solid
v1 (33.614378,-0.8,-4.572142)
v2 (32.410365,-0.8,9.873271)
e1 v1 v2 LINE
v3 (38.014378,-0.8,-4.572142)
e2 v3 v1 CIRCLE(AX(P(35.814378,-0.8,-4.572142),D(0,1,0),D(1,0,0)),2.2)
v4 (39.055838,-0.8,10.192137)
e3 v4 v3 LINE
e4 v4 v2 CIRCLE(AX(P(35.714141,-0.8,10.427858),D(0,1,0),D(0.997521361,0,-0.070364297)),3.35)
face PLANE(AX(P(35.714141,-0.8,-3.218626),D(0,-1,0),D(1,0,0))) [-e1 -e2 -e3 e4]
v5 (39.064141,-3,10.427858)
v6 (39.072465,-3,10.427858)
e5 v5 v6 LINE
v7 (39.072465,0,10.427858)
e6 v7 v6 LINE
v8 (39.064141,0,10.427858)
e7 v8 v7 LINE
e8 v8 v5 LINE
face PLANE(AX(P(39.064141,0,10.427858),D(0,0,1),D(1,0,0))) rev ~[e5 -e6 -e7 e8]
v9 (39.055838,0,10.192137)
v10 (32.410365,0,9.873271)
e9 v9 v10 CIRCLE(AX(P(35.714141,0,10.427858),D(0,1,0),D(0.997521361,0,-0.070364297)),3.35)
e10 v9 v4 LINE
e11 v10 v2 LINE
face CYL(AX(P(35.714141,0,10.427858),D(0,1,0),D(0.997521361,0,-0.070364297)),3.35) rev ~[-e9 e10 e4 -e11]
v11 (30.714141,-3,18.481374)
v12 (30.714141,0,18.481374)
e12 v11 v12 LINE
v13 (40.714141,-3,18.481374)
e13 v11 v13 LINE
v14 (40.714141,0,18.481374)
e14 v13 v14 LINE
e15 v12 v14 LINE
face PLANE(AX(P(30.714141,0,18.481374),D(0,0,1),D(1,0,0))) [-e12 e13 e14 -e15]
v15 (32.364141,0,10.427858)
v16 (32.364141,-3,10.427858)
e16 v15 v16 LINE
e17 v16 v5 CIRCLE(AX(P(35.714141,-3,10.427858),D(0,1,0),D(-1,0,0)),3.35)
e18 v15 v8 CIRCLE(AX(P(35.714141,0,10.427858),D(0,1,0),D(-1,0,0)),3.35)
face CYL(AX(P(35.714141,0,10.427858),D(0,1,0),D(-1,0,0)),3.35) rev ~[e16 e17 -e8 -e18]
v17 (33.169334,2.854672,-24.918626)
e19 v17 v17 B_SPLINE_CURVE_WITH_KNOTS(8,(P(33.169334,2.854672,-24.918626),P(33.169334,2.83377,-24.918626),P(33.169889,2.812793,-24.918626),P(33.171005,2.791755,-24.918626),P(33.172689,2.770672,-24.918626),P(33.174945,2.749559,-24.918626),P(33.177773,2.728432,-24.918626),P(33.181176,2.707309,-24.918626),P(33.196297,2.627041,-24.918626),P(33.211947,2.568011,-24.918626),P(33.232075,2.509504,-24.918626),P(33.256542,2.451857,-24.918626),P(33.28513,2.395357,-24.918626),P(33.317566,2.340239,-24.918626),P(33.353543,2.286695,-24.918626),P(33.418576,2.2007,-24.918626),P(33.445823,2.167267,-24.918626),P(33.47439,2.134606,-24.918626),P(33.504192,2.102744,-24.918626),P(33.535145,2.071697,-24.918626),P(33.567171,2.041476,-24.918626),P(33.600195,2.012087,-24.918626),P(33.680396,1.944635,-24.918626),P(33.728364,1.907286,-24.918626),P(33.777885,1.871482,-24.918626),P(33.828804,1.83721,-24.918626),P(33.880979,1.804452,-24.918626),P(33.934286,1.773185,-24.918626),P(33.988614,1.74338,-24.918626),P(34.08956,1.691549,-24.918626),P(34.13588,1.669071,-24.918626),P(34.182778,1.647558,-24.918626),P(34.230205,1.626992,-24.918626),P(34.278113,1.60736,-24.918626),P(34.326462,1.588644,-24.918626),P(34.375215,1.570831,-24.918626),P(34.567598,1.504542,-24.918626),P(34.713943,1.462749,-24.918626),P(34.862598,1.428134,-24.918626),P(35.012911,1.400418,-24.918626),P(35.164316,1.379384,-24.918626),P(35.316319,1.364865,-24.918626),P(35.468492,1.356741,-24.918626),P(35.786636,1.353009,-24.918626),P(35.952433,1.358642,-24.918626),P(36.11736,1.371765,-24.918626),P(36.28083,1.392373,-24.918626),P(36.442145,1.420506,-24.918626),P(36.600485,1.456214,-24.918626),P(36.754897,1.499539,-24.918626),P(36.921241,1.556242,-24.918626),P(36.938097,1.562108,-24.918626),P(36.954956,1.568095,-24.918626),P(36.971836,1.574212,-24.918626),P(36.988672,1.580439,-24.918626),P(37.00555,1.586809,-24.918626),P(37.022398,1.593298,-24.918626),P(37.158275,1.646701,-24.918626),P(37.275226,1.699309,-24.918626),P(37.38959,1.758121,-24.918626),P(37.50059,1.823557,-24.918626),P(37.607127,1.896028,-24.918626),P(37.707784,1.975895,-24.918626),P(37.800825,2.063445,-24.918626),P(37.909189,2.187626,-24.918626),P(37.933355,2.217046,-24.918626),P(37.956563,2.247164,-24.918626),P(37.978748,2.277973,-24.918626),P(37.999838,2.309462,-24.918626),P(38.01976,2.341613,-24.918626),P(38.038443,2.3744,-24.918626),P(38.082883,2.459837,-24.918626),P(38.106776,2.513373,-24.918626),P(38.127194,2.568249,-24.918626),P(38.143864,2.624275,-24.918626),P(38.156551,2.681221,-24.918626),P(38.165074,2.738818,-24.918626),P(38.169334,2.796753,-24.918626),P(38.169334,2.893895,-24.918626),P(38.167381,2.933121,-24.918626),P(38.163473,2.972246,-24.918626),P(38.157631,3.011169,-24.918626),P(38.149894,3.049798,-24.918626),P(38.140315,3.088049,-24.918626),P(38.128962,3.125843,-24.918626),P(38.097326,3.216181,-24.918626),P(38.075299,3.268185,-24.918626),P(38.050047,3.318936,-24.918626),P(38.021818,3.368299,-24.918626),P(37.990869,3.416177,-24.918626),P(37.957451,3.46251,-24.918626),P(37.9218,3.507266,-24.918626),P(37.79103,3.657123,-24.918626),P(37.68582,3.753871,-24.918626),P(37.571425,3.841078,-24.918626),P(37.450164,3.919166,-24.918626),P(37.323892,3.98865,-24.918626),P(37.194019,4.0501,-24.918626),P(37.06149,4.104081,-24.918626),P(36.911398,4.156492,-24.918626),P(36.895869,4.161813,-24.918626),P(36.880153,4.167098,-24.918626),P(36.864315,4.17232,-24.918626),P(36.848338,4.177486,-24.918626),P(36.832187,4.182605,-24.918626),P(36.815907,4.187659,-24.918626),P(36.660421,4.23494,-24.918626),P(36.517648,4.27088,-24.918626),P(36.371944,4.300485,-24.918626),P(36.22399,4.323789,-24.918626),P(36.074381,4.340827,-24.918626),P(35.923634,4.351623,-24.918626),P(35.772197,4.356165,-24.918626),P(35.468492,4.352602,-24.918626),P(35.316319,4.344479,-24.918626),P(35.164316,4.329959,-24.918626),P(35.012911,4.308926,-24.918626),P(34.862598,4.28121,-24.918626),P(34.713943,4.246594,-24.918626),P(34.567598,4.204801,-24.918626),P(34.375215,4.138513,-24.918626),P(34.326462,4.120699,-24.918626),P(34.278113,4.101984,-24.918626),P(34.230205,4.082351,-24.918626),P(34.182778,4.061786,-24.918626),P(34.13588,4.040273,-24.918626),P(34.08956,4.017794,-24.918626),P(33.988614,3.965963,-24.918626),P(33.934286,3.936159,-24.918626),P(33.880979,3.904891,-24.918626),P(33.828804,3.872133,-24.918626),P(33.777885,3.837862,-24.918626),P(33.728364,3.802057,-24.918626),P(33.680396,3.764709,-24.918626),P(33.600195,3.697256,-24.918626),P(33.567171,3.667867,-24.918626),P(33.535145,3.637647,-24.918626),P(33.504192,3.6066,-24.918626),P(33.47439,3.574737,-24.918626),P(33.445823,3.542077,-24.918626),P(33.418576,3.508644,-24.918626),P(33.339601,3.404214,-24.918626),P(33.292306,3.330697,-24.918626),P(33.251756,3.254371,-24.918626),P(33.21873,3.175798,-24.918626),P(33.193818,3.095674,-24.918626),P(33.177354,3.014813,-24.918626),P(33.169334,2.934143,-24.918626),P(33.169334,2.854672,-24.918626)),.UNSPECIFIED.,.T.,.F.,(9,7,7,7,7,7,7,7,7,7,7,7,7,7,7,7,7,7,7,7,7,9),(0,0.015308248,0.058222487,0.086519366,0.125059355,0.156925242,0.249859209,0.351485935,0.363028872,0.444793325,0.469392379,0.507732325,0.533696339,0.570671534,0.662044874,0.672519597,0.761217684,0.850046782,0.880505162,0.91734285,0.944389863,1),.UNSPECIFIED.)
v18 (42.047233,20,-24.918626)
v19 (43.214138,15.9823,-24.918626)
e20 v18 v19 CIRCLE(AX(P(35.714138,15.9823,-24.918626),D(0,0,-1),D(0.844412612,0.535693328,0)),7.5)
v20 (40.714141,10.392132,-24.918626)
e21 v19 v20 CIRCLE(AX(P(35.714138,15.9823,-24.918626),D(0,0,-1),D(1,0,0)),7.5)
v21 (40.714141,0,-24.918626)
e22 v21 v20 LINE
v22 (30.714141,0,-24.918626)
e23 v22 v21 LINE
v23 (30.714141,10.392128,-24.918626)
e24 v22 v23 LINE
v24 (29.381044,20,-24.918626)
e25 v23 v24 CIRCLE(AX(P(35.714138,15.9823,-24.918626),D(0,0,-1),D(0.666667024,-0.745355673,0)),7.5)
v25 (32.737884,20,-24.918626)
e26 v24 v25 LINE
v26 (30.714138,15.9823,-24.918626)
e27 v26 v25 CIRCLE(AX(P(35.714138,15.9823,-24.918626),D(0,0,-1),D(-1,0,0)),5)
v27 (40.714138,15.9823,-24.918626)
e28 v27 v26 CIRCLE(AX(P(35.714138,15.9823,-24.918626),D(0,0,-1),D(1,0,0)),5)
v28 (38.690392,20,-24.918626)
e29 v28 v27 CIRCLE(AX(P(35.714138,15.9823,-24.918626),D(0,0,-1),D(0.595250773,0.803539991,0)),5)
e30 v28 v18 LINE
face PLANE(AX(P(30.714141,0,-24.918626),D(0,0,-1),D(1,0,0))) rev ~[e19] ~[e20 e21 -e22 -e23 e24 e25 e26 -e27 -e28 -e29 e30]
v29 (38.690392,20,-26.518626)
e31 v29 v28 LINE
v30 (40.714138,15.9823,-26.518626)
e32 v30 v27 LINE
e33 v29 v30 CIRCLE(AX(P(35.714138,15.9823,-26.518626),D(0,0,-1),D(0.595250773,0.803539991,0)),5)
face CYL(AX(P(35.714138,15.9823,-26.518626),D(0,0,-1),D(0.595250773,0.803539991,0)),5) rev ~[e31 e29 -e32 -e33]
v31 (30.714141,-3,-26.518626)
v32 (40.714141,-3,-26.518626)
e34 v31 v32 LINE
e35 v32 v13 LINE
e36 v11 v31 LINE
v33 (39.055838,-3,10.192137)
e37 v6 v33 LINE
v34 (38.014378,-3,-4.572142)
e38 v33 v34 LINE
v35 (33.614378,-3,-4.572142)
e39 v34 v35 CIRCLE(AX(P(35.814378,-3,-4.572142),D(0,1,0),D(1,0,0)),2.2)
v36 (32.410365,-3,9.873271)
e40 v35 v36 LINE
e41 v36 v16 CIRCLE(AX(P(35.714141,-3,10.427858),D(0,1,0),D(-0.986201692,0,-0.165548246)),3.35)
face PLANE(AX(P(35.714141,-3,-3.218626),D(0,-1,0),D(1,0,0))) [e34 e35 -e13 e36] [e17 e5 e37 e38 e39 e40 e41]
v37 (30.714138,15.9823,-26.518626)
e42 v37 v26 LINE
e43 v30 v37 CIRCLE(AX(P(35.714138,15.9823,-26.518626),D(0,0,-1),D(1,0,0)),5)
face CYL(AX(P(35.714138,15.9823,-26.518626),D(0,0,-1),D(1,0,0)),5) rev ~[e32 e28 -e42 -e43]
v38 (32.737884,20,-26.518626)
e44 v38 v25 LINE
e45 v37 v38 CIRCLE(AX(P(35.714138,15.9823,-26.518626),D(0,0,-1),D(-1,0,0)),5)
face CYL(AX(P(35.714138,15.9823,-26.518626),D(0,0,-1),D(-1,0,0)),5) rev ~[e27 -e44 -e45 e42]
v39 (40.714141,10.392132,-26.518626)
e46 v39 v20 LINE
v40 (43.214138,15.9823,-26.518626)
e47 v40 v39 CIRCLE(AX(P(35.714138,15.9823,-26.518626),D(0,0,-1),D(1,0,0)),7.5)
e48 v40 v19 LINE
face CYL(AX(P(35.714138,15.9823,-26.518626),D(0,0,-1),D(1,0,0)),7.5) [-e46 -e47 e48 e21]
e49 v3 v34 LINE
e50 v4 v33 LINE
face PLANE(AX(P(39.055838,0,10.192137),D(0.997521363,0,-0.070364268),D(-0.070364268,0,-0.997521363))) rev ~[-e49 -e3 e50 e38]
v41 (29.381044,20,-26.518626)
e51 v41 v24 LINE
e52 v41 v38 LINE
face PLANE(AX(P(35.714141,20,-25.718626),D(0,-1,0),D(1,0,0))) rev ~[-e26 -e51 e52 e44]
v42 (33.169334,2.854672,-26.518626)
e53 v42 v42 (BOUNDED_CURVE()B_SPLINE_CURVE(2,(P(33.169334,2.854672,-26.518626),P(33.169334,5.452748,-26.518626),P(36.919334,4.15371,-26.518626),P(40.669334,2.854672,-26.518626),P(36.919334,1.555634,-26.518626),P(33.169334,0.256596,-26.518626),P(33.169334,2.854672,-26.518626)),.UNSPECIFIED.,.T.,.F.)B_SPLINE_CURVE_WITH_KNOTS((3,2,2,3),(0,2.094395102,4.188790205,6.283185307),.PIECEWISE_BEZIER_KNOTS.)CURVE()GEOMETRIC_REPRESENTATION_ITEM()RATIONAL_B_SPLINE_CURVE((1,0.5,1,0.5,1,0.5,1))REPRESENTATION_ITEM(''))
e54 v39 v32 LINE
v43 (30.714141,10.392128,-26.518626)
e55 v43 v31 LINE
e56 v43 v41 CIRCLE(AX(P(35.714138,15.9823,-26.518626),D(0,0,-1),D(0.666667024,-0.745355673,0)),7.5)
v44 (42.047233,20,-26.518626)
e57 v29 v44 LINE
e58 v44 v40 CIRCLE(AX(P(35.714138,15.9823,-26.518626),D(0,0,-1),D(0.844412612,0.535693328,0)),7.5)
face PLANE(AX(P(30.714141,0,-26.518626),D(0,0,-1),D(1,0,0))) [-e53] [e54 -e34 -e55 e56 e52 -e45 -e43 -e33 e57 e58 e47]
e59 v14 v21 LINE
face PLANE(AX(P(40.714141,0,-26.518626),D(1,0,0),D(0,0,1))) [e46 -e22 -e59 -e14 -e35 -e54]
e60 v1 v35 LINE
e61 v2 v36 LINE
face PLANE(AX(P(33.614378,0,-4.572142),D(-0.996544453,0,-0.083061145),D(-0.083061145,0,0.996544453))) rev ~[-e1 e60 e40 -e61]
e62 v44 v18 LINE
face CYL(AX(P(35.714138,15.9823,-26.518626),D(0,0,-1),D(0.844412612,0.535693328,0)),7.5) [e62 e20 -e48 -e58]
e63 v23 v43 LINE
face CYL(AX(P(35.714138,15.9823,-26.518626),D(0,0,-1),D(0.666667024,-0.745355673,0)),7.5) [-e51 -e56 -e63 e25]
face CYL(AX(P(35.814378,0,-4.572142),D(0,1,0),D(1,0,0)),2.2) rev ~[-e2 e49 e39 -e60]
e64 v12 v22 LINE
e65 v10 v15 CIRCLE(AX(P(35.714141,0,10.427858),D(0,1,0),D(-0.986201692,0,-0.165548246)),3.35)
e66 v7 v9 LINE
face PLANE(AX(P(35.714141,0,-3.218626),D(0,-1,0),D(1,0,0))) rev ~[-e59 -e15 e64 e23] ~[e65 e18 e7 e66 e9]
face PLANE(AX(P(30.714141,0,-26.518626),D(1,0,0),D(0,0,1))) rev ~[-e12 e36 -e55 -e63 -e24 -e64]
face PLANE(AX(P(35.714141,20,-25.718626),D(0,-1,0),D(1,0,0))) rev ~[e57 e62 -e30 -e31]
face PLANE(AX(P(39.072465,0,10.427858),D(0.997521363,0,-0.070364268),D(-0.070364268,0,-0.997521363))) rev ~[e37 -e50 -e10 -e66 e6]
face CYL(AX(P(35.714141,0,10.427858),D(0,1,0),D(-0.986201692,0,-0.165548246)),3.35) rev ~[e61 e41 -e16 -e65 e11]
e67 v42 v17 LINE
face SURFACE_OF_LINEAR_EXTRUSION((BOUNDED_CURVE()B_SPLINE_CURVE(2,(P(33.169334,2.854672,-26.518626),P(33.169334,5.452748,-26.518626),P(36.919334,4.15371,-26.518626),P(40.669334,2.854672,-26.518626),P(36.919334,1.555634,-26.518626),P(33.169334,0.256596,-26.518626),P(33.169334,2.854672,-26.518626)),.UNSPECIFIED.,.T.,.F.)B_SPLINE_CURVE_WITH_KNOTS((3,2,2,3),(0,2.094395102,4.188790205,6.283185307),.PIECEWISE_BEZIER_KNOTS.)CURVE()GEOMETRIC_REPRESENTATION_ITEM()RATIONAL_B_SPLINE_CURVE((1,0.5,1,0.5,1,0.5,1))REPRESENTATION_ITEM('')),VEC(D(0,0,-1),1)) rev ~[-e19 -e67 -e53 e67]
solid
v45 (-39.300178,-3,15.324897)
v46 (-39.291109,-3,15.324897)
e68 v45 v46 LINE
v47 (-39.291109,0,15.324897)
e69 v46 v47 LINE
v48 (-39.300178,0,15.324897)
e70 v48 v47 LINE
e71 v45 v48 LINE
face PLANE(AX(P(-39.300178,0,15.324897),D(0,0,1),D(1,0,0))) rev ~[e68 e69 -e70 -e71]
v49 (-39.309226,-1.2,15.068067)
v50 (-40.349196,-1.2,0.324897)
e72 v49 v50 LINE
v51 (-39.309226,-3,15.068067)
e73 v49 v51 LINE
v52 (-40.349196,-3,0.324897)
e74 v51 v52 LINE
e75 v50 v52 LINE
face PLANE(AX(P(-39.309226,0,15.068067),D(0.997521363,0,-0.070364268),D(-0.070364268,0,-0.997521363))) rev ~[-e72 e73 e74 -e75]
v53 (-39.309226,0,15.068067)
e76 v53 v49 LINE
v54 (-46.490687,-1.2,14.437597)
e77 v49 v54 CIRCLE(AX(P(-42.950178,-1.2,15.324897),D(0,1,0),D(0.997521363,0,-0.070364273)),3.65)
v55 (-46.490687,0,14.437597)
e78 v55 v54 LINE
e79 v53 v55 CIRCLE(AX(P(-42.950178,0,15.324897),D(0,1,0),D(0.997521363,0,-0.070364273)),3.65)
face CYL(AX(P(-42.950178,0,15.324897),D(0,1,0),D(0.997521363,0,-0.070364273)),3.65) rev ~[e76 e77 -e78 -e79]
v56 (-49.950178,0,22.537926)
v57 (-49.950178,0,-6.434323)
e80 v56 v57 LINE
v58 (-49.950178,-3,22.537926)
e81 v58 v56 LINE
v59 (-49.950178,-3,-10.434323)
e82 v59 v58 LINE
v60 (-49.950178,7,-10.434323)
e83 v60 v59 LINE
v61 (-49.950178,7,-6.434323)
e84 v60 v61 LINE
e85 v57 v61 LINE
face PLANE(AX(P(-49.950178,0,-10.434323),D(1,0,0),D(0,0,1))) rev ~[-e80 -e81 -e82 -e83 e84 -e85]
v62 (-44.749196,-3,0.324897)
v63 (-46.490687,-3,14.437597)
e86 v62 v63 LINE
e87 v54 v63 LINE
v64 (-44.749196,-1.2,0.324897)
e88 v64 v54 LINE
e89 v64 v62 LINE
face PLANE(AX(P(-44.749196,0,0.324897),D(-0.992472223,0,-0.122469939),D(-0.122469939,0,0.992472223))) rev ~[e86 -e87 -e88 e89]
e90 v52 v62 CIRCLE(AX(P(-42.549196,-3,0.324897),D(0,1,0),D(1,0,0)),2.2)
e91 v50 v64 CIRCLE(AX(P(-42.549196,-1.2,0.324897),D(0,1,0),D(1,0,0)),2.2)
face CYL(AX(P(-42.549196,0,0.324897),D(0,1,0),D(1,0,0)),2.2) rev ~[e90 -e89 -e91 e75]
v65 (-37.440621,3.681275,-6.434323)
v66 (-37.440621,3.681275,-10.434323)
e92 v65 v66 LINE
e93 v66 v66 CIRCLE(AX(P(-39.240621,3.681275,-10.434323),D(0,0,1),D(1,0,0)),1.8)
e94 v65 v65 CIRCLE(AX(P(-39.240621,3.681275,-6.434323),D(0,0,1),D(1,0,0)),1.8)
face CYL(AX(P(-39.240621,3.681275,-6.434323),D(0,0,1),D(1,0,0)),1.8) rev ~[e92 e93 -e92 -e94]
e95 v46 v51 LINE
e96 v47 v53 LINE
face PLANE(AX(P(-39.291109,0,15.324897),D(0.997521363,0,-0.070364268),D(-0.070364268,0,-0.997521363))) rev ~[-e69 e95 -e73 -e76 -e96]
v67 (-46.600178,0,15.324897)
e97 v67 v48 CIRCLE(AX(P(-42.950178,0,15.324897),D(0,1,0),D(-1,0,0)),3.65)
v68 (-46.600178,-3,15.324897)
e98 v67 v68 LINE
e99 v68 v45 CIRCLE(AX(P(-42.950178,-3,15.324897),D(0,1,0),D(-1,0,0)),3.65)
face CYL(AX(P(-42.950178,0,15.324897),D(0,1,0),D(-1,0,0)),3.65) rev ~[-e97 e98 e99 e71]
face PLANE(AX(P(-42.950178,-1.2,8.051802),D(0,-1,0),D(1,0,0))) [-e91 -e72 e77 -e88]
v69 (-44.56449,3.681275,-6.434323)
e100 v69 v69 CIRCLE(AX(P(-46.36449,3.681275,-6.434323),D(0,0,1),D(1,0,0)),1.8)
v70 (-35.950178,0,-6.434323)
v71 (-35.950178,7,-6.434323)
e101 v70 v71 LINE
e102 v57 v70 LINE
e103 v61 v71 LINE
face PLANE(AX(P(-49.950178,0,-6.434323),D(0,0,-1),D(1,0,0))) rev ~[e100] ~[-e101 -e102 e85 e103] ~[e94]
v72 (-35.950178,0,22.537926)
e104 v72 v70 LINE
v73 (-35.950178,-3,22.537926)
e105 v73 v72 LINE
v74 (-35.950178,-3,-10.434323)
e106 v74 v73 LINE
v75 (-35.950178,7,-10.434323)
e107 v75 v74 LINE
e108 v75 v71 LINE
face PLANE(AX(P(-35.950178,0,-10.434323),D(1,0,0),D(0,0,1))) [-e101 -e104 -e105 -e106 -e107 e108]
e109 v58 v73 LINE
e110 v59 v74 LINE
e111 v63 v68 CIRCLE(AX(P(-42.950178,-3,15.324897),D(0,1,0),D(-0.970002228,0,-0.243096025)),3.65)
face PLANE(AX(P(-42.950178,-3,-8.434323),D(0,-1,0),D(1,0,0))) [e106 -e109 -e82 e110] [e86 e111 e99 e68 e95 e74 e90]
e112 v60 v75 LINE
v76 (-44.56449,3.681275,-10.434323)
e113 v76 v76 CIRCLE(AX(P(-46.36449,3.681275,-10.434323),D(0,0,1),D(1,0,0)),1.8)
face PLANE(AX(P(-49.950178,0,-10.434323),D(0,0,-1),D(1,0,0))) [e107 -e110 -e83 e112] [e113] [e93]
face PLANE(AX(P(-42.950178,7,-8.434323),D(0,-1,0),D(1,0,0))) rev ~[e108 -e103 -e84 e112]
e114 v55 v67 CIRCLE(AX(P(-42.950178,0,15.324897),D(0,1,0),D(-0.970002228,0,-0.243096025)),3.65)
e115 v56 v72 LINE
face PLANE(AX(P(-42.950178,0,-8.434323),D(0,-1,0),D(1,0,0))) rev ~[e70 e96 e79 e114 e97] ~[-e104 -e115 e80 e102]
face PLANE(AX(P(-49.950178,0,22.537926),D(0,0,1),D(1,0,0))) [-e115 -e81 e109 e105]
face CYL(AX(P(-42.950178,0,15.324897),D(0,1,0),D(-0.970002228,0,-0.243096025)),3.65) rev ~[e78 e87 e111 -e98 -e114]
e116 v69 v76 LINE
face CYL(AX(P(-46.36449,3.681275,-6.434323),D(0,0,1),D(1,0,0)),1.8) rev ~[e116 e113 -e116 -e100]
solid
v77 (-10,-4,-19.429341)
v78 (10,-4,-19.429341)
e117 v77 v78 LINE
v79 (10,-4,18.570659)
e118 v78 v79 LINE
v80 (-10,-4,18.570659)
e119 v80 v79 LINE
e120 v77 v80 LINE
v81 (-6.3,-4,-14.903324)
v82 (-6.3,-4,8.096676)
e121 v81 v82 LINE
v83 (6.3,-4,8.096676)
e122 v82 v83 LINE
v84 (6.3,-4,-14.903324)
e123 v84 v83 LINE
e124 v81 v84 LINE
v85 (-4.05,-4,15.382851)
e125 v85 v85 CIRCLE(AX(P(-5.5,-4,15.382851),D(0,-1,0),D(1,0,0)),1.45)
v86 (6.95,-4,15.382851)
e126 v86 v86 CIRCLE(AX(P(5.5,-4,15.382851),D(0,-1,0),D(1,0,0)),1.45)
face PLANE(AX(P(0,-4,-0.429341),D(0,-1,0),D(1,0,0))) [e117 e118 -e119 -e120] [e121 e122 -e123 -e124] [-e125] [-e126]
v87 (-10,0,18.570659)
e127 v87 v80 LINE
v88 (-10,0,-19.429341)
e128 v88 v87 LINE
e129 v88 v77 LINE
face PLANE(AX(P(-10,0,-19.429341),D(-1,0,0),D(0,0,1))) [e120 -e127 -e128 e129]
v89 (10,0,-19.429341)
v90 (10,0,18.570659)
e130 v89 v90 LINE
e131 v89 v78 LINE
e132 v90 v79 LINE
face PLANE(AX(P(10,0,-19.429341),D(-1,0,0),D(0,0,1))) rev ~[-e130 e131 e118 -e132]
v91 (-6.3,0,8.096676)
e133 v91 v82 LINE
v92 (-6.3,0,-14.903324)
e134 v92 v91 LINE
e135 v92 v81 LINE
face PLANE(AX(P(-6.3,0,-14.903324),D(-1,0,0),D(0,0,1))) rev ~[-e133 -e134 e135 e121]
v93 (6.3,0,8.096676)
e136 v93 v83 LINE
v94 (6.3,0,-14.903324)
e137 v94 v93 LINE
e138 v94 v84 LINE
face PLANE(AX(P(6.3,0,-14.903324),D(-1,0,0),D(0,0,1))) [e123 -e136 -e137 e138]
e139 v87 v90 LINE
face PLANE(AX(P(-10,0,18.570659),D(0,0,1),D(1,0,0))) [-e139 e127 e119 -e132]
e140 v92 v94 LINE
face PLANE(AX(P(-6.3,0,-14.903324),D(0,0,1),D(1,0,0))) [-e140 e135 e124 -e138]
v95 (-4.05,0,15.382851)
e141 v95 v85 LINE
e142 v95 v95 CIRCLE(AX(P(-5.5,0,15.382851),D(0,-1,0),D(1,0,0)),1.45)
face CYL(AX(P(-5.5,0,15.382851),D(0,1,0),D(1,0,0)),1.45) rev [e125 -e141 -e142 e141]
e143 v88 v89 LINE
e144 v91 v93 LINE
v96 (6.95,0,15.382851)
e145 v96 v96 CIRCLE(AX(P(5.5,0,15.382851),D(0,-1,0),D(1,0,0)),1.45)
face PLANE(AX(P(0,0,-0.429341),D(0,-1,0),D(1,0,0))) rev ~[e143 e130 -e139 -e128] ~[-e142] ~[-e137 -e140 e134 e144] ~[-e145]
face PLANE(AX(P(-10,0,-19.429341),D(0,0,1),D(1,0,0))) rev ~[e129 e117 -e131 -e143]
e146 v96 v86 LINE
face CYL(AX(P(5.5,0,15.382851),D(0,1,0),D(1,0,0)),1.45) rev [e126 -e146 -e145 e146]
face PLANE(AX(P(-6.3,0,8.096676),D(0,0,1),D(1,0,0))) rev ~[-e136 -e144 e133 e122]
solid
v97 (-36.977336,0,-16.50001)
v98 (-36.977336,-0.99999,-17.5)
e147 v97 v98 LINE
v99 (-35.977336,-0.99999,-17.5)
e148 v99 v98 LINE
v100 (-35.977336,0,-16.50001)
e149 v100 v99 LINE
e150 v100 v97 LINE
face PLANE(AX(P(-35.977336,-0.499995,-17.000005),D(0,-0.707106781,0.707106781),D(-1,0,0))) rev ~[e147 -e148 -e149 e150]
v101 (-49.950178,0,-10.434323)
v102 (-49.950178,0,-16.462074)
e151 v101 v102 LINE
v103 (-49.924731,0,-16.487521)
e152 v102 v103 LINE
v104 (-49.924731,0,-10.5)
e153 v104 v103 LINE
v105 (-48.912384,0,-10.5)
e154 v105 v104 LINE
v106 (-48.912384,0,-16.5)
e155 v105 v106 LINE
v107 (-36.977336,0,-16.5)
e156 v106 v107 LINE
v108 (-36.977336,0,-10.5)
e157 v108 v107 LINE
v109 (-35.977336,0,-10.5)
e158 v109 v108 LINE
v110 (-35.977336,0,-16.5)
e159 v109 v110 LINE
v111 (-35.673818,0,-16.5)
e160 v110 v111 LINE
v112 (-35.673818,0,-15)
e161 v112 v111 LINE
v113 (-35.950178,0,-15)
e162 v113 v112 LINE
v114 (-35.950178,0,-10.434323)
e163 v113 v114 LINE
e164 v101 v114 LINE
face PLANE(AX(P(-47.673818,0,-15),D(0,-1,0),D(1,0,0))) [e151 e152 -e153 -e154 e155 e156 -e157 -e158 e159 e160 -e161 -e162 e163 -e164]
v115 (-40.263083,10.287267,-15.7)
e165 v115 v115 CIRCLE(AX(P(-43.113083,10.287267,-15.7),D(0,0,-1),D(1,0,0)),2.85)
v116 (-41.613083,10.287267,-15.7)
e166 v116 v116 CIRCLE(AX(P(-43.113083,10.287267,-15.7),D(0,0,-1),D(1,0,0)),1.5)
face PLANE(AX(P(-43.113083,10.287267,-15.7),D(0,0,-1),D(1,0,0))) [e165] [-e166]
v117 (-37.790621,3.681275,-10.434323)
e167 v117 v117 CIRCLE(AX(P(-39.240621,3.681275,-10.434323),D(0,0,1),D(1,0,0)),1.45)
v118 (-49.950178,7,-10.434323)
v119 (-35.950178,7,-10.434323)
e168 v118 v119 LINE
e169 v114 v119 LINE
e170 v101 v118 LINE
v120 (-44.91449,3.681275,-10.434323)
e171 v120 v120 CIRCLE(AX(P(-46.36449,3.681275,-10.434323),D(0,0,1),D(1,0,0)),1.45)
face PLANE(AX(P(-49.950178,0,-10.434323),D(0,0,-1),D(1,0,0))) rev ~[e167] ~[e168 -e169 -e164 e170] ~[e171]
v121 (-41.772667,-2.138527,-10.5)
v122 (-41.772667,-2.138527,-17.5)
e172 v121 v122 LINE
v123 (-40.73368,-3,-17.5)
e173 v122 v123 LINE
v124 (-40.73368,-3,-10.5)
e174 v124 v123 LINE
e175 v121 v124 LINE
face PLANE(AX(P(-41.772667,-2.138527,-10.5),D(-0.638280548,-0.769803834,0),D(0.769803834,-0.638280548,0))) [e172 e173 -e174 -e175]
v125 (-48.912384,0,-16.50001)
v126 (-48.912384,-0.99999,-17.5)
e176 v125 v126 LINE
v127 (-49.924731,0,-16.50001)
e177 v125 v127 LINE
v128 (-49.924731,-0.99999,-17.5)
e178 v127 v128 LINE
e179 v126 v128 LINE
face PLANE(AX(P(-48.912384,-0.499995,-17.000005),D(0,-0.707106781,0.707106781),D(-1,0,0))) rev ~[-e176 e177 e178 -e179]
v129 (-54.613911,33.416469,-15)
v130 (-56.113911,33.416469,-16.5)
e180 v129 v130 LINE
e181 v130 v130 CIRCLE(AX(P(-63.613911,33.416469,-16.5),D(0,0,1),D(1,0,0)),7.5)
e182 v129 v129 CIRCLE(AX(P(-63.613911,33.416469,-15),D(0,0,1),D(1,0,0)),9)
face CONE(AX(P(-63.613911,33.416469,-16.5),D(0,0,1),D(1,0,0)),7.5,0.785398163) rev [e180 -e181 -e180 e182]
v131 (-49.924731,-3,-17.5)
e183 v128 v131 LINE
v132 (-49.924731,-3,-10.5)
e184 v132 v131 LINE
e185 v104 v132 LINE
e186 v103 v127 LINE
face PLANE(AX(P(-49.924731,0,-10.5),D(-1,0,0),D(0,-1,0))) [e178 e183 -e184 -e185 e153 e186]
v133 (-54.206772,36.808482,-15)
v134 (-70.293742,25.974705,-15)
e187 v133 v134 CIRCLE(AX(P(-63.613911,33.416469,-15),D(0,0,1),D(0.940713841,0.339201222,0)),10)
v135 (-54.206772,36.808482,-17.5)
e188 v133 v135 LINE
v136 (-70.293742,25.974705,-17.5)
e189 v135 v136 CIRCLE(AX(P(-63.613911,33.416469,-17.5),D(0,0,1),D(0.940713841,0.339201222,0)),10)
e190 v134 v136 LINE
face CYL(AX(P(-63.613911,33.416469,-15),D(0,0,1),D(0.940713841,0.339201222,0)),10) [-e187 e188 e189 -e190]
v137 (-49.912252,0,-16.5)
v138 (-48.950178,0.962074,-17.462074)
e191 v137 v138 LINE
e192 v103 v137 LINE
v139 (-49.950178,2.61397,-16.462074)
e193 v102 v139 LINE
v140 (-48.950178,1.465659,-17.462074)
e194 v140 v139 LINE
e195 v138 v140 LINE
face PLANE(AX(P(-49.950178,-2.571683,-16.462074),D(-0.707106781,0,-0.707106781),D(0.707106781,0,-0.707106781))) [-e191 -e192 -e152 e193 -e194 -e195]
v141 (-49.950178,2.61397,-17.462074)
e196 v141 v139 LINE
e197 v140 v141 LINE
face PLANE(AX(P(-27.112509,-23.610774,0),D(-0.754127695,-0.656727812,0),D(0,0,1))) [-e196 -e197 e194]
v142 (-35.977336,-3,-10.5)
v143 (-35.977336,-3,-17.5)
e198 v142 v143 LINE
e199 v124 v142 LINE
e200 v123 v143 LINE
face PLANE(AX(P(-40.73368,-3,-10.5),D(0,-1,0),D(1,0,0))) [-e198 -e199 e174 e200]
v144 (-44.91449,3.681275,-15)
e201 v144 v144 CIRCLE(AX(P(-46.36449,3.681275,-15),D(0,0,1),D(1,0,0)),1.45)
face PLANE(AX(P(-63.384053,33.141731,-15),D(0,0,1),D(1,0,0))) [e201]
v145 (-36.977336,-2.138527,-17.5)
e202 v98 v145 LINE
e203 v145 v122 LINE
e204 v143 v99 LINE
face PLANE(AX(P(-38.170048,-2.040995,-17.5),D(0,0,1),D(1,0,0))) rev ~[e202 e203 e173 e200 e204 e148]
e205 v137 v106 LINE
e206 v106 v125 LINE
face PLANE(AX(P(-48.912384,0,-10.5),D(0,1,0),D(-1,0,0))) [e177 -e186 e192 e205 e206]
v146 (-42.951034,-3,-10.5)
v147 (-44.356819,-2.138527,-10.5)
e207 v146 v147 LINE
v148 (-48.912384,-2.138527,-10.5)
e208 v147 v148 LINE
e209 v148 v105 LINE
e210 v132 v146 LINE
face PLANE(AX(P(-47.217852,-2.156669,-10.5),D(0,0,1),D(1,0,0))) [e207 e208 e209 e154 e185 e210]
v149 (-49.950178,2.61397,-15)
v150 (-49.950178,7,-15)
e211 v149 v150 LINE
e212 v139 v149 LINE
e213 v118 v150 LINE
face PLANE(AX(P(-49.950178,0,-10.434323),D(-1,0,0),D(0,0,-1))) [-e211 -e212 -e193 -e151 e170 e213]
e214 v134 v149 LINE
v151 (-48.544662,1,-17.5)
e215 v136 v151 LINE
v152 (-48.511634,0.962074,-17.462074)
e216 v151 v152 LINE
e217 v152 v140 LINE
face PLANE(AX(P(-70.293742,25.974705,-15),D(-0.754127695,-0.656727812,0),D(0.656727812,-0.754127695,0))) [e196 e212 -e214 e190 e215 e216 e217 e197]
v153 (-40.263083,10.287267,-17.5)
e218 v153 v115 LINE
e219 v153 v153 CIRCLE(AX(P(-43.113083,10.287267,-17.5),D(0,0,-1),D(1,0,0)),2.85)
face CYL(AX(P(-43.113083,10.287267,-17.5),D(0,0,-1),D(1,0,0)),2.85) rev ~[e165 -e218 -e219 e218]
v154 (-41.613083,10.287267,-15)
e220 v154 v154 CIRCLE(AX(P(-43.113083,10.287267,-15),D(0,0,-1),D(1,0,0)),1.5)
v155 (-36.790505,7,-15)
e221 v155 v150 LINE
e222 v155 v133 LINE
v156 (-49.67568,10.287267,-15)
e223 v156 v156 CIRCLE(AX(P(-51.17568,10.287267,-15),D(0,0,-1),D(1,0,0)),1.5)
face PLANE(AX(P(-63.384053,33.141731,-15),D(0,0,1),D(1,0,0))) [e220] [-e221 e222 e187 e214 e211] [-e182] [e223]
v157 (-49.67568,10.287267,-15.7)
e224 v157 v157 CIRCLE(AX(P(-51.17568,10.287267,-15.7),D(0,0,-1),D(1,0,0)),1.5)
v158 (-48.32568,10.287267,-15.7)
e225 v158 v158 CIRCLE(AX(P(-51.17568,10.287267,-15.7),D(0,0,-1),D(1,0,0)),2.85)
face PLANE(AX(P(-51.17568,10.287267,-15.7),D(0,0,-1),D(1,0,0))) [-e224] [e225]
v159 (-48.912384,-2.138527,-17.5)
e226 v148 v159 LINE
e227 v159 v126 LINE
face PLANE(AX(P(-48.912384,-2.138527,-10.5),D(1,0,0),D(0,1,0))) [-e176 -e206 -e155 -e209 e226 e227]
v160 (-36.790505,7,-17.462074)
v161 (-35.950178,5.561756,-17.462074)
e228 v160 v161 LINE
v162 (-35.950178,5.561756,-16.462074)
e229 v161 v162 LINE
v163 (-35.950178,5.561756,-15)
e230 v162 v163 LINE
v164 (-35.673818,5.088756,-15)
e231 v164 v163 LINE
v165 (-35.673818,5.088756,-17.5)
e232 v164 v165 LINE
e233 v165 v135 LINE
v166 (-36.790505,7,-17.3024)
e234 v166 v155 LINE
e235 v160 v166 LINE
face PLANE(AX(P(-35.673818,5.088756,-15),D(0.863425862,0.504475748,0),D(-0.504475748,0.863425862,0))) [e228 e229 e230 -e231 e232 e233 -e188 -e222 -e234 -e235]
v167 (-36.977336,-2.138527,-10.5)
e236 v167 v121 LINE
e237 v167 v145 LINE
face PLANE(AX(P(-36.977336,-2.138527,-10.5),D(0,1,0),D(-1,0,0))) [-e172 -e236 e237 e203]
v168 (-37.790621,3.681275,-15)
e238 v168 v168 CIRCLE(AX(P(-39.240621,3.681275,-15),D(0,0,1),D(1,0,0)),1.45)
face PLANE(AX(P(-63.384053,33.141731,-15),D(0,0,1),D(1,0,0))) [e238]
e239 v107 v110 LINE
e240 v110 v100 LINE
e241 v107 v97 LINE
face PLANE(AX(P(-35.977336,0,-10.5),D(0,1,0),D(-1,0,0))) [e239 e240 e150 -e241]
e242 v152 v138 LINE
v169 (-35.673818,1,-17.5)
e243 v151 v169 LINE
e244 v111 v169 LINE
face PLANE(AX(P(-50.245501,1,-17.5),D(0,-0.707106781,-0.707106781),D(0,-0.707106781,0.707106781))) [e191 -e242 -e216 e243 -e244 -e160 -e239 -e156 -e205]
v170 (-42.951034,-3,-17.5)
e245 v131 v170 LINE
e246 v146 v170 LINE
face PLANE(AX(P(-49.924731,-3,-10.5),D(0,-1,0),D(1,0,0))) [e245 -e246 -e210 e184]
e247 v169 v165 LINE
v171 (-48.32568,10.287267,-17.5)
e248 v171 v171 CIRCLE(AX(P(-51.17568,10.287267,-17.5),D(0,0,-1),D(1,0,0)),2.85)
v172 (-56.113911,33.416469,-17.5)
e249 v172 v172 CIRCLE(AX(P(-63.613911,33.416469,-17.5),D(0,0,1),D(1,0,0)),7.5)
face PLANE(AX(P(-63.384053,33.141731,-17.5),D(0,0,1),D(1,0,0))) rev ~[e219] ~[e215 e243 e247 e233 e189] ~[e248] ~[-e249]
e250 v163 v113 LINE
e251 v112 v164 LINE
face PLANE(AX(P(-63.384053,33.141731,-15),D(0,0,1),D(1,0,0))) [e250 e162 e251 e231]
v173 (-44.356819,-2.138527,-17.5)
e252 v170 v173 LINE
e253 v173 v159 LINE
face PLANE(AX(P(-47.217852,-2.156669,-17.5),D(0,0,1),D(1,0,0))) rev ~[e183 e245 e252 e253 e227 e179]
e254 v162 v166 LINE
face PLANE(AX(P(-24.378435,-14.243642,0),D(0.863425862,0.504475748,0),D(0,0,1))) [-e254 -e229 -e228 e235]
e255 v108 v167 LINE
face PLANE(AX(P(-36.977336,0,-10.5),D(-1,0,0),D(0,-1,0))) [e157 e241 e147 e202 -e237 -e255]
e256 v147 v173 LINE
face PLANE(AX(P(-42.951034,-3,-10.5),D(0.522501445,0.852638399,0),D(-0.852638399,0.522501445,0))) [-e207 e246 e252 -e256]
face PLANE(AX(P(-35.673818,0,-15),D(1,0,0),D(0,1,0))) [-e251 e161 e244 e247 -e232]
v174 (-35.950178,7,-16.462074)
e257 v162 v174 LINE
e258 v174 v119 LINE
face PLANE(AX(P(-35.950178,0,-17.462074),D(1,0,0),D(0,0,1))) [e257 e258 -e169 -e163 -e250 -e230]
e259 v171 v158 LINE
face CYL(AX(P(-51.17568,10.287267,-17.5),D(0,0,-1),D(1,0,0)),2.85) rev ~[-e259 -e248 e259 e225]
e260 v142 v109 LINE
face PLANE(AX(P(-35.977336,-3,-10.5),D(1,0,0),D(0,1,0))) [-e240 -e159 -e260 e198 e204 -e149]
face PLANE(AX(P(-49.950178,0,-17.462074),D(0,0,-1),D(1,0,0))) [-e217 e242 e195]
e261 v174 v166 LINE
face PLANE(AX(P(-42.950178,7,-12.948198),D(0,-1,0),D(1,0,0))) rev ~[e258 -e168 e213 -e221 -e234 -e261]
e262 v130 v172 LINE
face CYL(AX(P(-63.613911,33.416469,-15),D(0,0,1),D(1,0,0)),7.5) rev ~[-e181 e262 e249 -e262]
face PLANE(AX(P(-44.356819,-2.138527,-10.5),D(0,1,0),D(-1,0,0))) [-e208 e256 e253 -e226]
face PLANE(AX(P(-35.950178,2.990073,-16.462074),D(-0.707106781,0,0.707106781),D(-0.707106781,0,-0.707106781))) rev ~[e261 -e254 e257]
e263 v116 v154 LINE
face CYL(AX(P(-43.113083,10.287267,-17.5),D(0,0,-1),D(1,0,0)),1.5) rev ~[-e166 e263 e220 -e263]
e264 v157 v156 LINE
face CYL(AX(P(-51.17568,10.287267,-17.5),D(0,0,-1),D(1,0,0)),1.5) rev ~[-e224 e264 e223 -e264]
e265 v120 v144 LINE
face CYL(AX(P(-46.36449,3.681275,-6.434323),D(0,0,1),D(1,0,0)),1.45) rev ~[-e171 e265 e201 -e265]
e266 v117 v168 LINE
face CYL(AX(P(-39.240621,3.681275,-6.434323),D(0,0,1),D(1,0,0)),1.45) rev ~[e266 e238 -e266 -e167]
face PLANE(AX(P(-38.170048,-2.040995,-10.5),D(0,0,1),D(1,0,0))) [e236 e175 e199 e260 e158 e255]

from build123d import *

# Parameters (mm, degrees)
F0_W           = 20
F0_H           = 38
F0_W_2         = 12.6
F0_H_2         = 23
F0_R           = 1.45
F1_DEPTH       = 4
F2_W           = 10
F2_H           = 43.4
F2_H_2         = 1.6
F3_DEPTH       = 3
F4_DEPTH       = 0.8
F5_DEPTH       = 20
F7_DEPTH       = 1.6
F8_DEPTH       = 25
F9_W           = 14
F9_H           = 28.9722495526
F10_DEPTH      = 3
F11_DEPTH      = 1.2
F9_H_2         = 5.0277504474
F9_H_3         = 2
F12_DEPTH      = 7
F9_H_4         = 4
F13_DEPTH      = 3
F13_DEPTH_BACK = 7
F14_R          = 1.8
F14_R_2        = 1.45
F15_DEPTH      = 25
F16_DEPTH      = 9
F18_START      = -15
F17_R          = 7.5
F18_DEPTH      = 2.5
F19_SIZE       = 1.5
F20_T1_DEPTH   = 17.1433659759
F20_T6_DEPTH   = 7.7573358308
F20_T11_DEPTH  = 6.5816100927
F22_START      = -10.5
F22_DEPTH      = 7
F23_SIZE       = 0.99999
F24_R          = 2.85
F24_R_2        = 1.5
F25_DEPTH      = 1.8
F26_DEPTH      = 25


# Not quite as in the source:
# - a fillet or chamfer that OpenCascade refuses, or shapes differently, is made with other operations: its cross-section is extruded or revolved along the edge and cut away or added
# - a fillet or chamfer is up to 0.001 mm smaller than in the source, because OpenCascade refuses the exact size
# - ends of sketch curves that miss each other by under 0.0002 mm in the source are joined


with BuildPart() as f1:
    # F0 (on Front) → F1 (new body)
    with BuildSketch(Plane.XZ):
        with Locations((0, -0.4293409586)):
            Rectangle(F0_W, F0_H)
        with Locations((0, -3.4033237249)):
            Rectangle(F0_W_2, F0_H_2, mode=Mode.SUBTRACT)
        with Locations((-5.5, 15.3828505427)):
            Circle(F0_R, mode=Mode.SUBTRACT)
        with Locations((5.5, 15.3828505427)):
            Circle(F0_R, mode=Mode.SUBTRACT)
    extrude(amount=F1_DEPTH)


with BuildPart() as f3:
    # F2 (on Front) → F3 (new body)
    with BuildSketch(Plane.XZ):
        with Locations((35.7141409814, -3.2186261386)):
            Rectangle(F2_W, F2_H)
        with BuildLine():
            ThreePointArc((32.3641409814, 10.4278577492), (35.7141409814, 13.7778577492), (39.0641409814, 10.4278577492))
            Line((39.0641409814, 10.4278577492), (39.0724650475, 10.4278577492))
            Line((39.0724650475, 10.4278577492), (39.055837541, 10.1921373555))
            Line((39.055837541, 10.1921373555), (38.0143784106, -4.5721422508))
            ThreePointArc((38.0143784106, -4.5721422508), (35.8143784106, -6.7721422508), (33.6143784106, -4.5721422508))
            Line((33.6143784106, -4.5721422508), (32.4103653119, 9.8732711234))
            ThreePointArc((32.4103653119, 9.8732711234), (32.3757170649, 10.1496029135), (32.3641409814, 10.4278577492))
        make_face(mode=Mode.SUBTRACT)
        with Locations((35.7141409814, -25.7186261386)):
            Rectangle(F2_W, F2_H_2)
    extrude(amount=F3_DEPTH)

    # F2 (on Front) → F4 (join)
    with BuildSketch(Plane.XZ):
        with Locations((35.7141409814, -3.2186261386)):
            Rectangle(F2_W, F2_H)
        with BuildLine():
            ThreePointArc((32.3641409814, 10.4278577492), (35.7141409814, 13.7778577492), (39.0641409814, 10.4278577492))
            Line((39.0641409814, 10.4278577492), (39.0724650475, 10.4278577492))
            Line((39.0724650475, 10.4278577492), (39.055837541, 10.1921373555))
            Line((39.055837541, 10.1921373555), (38.0143784106, -4.5721422508))
            ThreePointArc((38.0143784106, -4.5721422508), (35.8143784106, -6.7721422508), (33.6143784106, -4.5721422508))
            Line((33.6143784106, -4.5721422508), (32.4103653119, 9.8732711234))
            ThreePointArc((32.4103653119, 9.8732711234), (32.3757170649, 10.1496029135), (32.3641409814, 10.4278577492))
        make_face(mode=Mode.SUBTRACT)
        with BuildLine():
            Line((38.0143784106, -4.5721422508), (39.055837541, 10.1921373555))
            ThreePointArc((39.055837541, 10.1921373555), (35.8746975664, 7.0817074861), (32.4103653119, 9.8732711234))
            Line((32.4103653119, 9.8732711234), (33.6143784106, -4.5721422508))
            ThreePointArc((33.6143784106, -4.5721422508), (35.8143784106, -2.3721422508), (38.0143784106, -4.5721422508))
        make_face()
        with BuildLine():
            Line((33.6143784106, -4.5721422508), (38.0143784106, -4.5721422508))
            ThreePointArc((38.0143784106, -4.5721422508), (35.8143784106, -2.3721422508), (33.6143784106, -4.5721422508))
        make_face()
        with BuildLine():
            ThreePointArc((33.6143784106, -4.5721422508), (35.8143784106, -6.7721422508), (38.0143784106, -4.5721422508))
            Line((38.0143784106, -4.5721422508), (33.6143784106, -4.5721422508))
        make_face()
    extrude(amount=F4_DEPTH)

    # F2 (on Front) → F5 (join)
    with BuildSketch(Plane.XZ):
        with Locations((35.7141409814, -25.7186261386)):
            Rectangle(F2_W, F2_H_2)
    extrude(amount=-F5_DEPTH)

    # F6 (on face) → F7 (join)
    with BuildSketch(Plane(origin=(0, 0, -26.5186261386), x_dir=(1, 0, 0), z_dir=(0, 0, -1))):
        with BuildLine():
            Line((30.7141409814, -15.9823000431), (30.7141409814, -20))
            Line((30.7141409814, -20), (32.7378844363, -20))
            ThreePointArc((32.7378844363, -20), (31.2486445239, -18.2316033447), (30.7141409814, -15.9823000431))
        make_face()
        with BuildLine():
            Line((38.6903921621, -20), (40.7141409814, -20))
            Line((40.7141409814, -20), (40.7141409814, -15.9823000431))
            ThreePointArc((40.7141409814, -15.9823000431), (40.1796320745, -18.2316033447), (38.6903921621, -20))
        make_face()
        with BuildLine():
            ThreePointArc((40.7141409814, -10.3921324984), (35.7141418978, -8.4823000431), (30.7141409814, -10.3921277003))
            Line((30.7141409814, -10.3921277003), (30.7141409814, -15.9823000431))
            ThreePointArc((30.7141409814, -15.9823000431), (35.7141382992, -10.9823000431), (40.7141382992, -15.9823000431))
            Line((40.7141382992, -15.9823000431), (40.7141409814, -10.3921324984))
        make_face()
        with BuildLine():
            Line((40.7141409814, -20), (42.0472328869, -20))
            ThreePointArc((42.0472328869, -20), (42.916506292, -18.0741641152), (43.2141382992, -15.9823000431))
            ThreePointArc((43.2141382992, -15.9823000431), (42.5606710026, -12.9204395071), (40.7141409814, -10.3921324984))
            Line((40.7141409814, -10.3921324984), (40.7141409814, -15.9823000431))
            Line((40.7141409814, -15.9823000431), (40.7141409814, -20))
        make_face()
        with BuildLine():
            ThreePointArc((30.7141409814, -10.3921277003), (28.2853062533, -14.9515457398), (29.3810437116, -20))
            Line((29.3810437116, -20), (30.7141409814, -20))
            Line((30.7141409814, -20), (30.7141409814, -15.9823000431))
            Line((30.7141409814, -15.9823000431), (30.7141409814, -10.3921277003))
        make_face()
    extrude(amount=-F7_DEPTH)

    # F6 (on face) → F8 (cut)
    with BuildSketch(Plane(origin=(0, 0, -26.5186261386), x_dir=(1, 0, 0), z_dir=(0, 0, -1))):
        with BuildLine():
            add(Edge.make_bspline(
                [(33.1693342328, -2.8546717949), (33.1693342328, -5.4527480063), (36.9193342328, -4.1537099006), (40.6693342328, -2.8546717949), (36.9193342328, -1.5556336892), (33.1693342328, -0.2565955836), (33.1693342328, -2.8546717949)],
                knots=[0, 0, 0, 2.0943951024, 2.0943951024, 4.1887902048, 4.1887902048, 6.2831853072, 6.2831853072, 6.2831853072], degree=2, weights=[1, 0.5, 1, 0.5, 1, 0.5, 1]))
        make_face()
        with BuildLine():
            ThreePointArc((40.7141382992, -15.9823000431), (35.7141382992, -10.9823000431), (30.7141382992, -15.9823000431))
            ThreePointArc((30.7141382992, -15.9823000431), (31.2486445239, -18.2316033447), (32.7378844363, -20))
            Line((32.7378844363, -20), (38.6903921621, -20))
            ThreePointArc((38.6903921621, -20), (40.1796320745, -18.2316033447), (40.7141382992, -15.9823000431))
        make_face()
    extrude(amount=-F8_DEPTH, mode=Mode.SUBTRACT)


with BuildPart() as f10:
    # F9 (on Front) → F10 (new body)
    with BuildSketch(Plane.XZ):
        with Locations((-42.9501784987, 8.0518015102)):
            Rectangle(F9_W, F9_H)
        with BuildLine():
            ThreePointArc((-46.6001784987, 15.3248970558), (-42.9501784987, 18.9748970558), (-39.3001784987, 15.3248970558))
            Line((-39.3001784987, 15.3248970558), (-39.2911089939, 15.3248970558))
            Line((-39.2911089939, 15.3248970558), (-39.3092255247, 15.0680674607))
            Line((-39.3092255247, 15.0680674607), (-40.3491956308, 0.3248970558))
            ThreePointArc((-40.3491956308, 0.3248970558), (-42.5491956308, -1.8751029442), (-44.7491956308, 0.3248970558))
            Line((-44.7491956308, 0.3248970558), (-46.4906866316, 14.4375965648))
            ThreePointArc((-46.4906866316, 14.4375965648), (-46.5727021139, 14.8778817791), (-46.6001784987, 15.3248970558))
        make_face(mode=Mode.SUBTRACT)
    extrude(amount=F10_DEPTH)

    # F9 (on Front) → F11 (join)
    with BuildSketch(Plane.XZ):
        with Locations((-42.9501784987, 8.0518015102)):
            Rectangle(F9_W, F9_H)
        with BuildLine():
            ThreePointArc((-46.6001784987, 15.3248970558), (-42.9501784987, 18.9748970558), (-39.3001784987, 15.3248970558))
            Line((-39.3001784987, 15.3248970558), (-39.2911089939, 15.3248970558))
            Line((-39.2911089939, 15.3248970558), (-39.3092255247, 15.0680674607))
            Line((-39.3092255247, 15.0680674607), (-40.3491956308, 0.3248970558))
            ThreePointArc((-40.3491956308, 0.3248970558), (-42.5491956308, -1.8751029442), (-44.7491956308, 0.3248970558))
            Line((-44.7491956308, 0.3248970558), (-46.4906866316, 14.4375965648))
            ThreePointArc((-46.4906866316, 14.4375965648), (-46.5727021139, 14.8778817791), (-46.6001784987, 15.3248970558))
        make_face(mode=Mode.SUBTRACT)
        with BuildLine():
            Line((-40.3491956308, 0.3248970558), (-39.3092255247, 15.0680674607))
            ThreePointArc((-39.3092255247, 15.0680674607), (-42.6309674726, 11.6888821603), (-46.4906866316, 14.4375965648))
            Line((-46.4906866316, 14.4375965648), (-44.7491956308, 0.3248970558))
            ThreePointArc((-44.7491956308, 0.3248970558), (-42.5491956308, 2.5248970558), (-40.3491956308, 0.3248970558))
        make_face()
        with BuildLine():
            Line((-44.7491956308, 0.3248970558), (-40.3491956308, 0.3248970558))
            ThreePointArc((-40.3491956308, 0.3248970558), (-42.5491956308, 2.5248970558), (-44.7491956308, 0.3248970558))
        make_face()
        with BuildLine():
            ThreePointArc((-44.7491956308, 0.3248970558), (-42.5491956308, -1.8751029442), (-40.3491956308, 0.3248970558))
            Line((-40.3491956308, 0.3248970558), (-44.7491956308, 0.3248970558))
        make_face()
    extrude(amount=F11_DEPTH)

    # F9 (on Front) → F13 (join, two sides)
    with BuildSketch(Plane.XZ) as f13_sk:
        with Locations((-42.9501784987, -8.4343232661)):
            Rectangle(F9_W, F9_H_4)
    extrude(amount=F13_DEPTH)
    extrude(f13_sk.sketch, amount=-F13_DEPTH_BACK)

    # F14 (on face) → F15 (cut)
    with BuildSketch(Plane.XY.offset(-6.4343232661)):
        with Locations((-39.2406210303, 3.6812750623)):
            Circle(F14_R)
        with Locations((-39.2406210303, 3.6812750623)):
            Circle(F14_R_2, mode=Mode.SUBTRACT)
        with Locations((-46.3644899428, 3.6812750623)):
            Circle(F14_R)
        with Locations((-46.3644899428, 3.6812750623)):
            Circle(F14_R_2, mode=Mode.SUBTRACT)
        with Locations((-39.2406210303, 3.6812750623)):
            Circle(F14_R_2)
        with Locations((-46.3644899428, 3.6812750623)):
            Circle(F14_R_2)
    extrude(amount=-F15_DEPTH, mode=Mode.SUBTRACT)


with BuildPart() as f12:
    # F9 (on Front) → F12 (new body)
    with BuildSketch(Plane.XZ):
        with Locations((-42.9501784987, -12.9481984898)):
            Rectangle(F9_W, F9_H_2)
        with Locations((-42.9501784987, -16.4620737135)):
            Rectangle(F9_W, F9_H_3)
    extrude(amount=-F12_DEPTH)

    # F14 (on face) → F16 (cut)
    with BuildSketch(Plane.XY.offset(-6.4343232661)):
        with Locations((-39.2406210303, 3.6812750623)):
            Circle(F14_R_2)
        with Locations((-46.3644899428, 3.6812750623)):
            Circle(F14_R_2)
    extrude(amount=-F16_DEPTH, mode=Mode.SUBTRACT)

    # F17 (on Top) → F18 (join)
    with BuildSketch(Plane.XY.offset(F18_START)):
        with BuildLine():
            ThreePointArc((-70.2937416126, 25.9747048099), (-59.5394972596, 24.2841557658), (-53.6139108759, 33.416469475))
            ThreePointArc((-53.6139108759, 33.416469475), (-53.7632412512, 35.1381860441), (-54.2067724648, 36.8084816969))
            ThreePointArc((-54.2067724648, 36.8084816969), (-69.1998067035, 41.7109114576), (-70.2937416126, 25.9747048099))
        make_face()
        with Locations((-63.6139108759, 33.416469475)):
            Circle(F17_R, mode=Mode.SUBTRACT)
        with BuildLine():
            ThreePointArc((-54.2067724648, 36.8084816969), (-53.7632412512, 35.1381860441), (-53.6139108759, 33.416469475))
            ThreePointArc((-53.6139108759, 33.416469475), (-59.5394972596, 24.2841557658), (-70.2937416126, 25.9747048099))
            Line((-70.2937416126, 25.9747048099), (-47.673817724, 0))
            Line((-47.673817724, 0), (-35.673817724, 0))
            Line((-35.673817724, 0), (-35.673817724, 5.0887558609))
            Line((-35.673817724, 5.0887558609), (-54.2067724648, 36.8084816969))
        make_face()
    extrude(amount=-F18_DEPTH)

    # F19
    f19_edges = [f12.edges().sort_by_distance(p)[0] for p in [
        (-71.113911, 33.416469, -15),
    ]]
    chamfer(f19_edges, length=F19_SIZE)

    # F20: chamfer of 1 on 3 edges, made by hand

    # F20_s2 → F20_t1 (cut)
    with BuildSketch(Plane.YZ.offset(-50.245500712)):
        Polygon((1, -17.5), (0, -16.5), (0, -17.5), align=None)
    extrude(amount=F20_T1_DEPTH, mode=Mode.SUBTRACT)


with BuildPart() as f20_tool4:
    # F20_s5 → F20_t6 (new body)
    with BuildSketch(Plane.XZ.offset(2.571682988)):
        Polygon((-49.9501784987, -16.4620737135), (-48.9501784987, -17.4620737135), (-49.9501784987, -17.4620737135), align=None)
    extrude(amount=-F20_T6_DEPTH)

    split(bisect_by=Plane(origin=(-27.1125092059, -23.6107743728, 0), x_dir=(0, 0, 1), z_dir=(-0.7541276951, -0.6567278123, 0)), keep=Keep.TOP)


with BuildPart() as f12_1:
    add(f12.part)

    # F20_t3: cut F20_tool4
    add(f20_tool4.part, mode=Mode.SUBTRACT)


with BuildPart() as f20_tool9:
    # F20_s10 → F20_t11 (new body)
    with BuildSketch(Plane.XZ.offset(-2.9900728953)):
        Polygon((-35.9501784987, -16.4620737135), (-36.9501784987, -17.4620737135), (-35.9501784987, -17.4620737135), align=None)
    extrude(amount=-F20_T11_DEPTH)

    split(bisect_by=Plane(origin=(-24.3784345493, -14.2436421579, 0), x_dir=(0, 0, 1), z_dir=(0.8634258622, 0.5044757482, 0)), keep=Keep.TOP)


with BuildPart() as f12_2:
    add(f12_1.part)

    # F20_t8: cut F20_tool9
    add(f20_tool9.part, mode=Mode.SUBTRACT)

    # F21 (on Top) → F22 (join)
    with BuildSketch(Plane.XY.offset(F22_START)):
        Polygon((-48.912383616, 0), (-49.9247312546, 0), (-49.9247312546, -3), (-42.9510335326, -3), (-44.3568192422, -2.1385268774), (-48.912383616, -2.1385268774), align=None)
        Polygon((-41.7726673186, -2.1385268774), (-40.7336801291, -3), (-35.9773358107, -3), (-35.9773358107, 0), (-36.9773358107, 0), (-36.9773358107, -2.1385268774), align=None)
    extrude(amount=-F22_DEPTH)

    # F23 (size 1 in the source; OpenCascade refuses exactly that, so slightly less here)
    f23_edges = [f12_2.edges().sort_by_distance(p)[0] for p in [
        (-36.477336, 0, -17.5),
        (-49.418557, 0, -17.5),
    ]]
    chamfer(f23_edges, length=F23_SIZE)

    # F24 (on face) → F25 (cut)
    with BuildSketch(Plane(origin=(0, 0, -17.5), x_dir=(1, 0, 0), z_dir=(0, 0, -1))):
        with Locations((-51.1756800115, -10.2872671559)):
            Circle(F24_R)
        with Locations((-51.1756800115, -10.2872671559)):
            Circle(F24_R_2, mode=Mode.SUBTRACT)
        with Locations((-43.1130826473, -10.2872671559)):
            Circle(F24_R)
        with Locations((-43.1130826473, -10.2872671559)):
            Circle(F24_R_2, mode=Mode.SUBTRACT)
    extrude(amount=-F25_DEPTH, mode=Mode.SUBTRACT)

    # F24 (on face) → F26 (cut)
    with BuildSketch(Plane(origin=(0, 0, -17.5), x_dir=(1, 0, 0), z_dir=(0, 0, -1))):
        with Locations((-51.1756800115, -10.2872671559)):
            Circle(F24_R_2)
        with Locations((-43.1130826473, -10.2872671559)):
            Circle(F24_R_2)
    extrude(amount=-F26_DEPTH, mode=Mode.SUBTRACT)


solid = Compound([f1.part, f3.part, f10.part, f12_2.part])
